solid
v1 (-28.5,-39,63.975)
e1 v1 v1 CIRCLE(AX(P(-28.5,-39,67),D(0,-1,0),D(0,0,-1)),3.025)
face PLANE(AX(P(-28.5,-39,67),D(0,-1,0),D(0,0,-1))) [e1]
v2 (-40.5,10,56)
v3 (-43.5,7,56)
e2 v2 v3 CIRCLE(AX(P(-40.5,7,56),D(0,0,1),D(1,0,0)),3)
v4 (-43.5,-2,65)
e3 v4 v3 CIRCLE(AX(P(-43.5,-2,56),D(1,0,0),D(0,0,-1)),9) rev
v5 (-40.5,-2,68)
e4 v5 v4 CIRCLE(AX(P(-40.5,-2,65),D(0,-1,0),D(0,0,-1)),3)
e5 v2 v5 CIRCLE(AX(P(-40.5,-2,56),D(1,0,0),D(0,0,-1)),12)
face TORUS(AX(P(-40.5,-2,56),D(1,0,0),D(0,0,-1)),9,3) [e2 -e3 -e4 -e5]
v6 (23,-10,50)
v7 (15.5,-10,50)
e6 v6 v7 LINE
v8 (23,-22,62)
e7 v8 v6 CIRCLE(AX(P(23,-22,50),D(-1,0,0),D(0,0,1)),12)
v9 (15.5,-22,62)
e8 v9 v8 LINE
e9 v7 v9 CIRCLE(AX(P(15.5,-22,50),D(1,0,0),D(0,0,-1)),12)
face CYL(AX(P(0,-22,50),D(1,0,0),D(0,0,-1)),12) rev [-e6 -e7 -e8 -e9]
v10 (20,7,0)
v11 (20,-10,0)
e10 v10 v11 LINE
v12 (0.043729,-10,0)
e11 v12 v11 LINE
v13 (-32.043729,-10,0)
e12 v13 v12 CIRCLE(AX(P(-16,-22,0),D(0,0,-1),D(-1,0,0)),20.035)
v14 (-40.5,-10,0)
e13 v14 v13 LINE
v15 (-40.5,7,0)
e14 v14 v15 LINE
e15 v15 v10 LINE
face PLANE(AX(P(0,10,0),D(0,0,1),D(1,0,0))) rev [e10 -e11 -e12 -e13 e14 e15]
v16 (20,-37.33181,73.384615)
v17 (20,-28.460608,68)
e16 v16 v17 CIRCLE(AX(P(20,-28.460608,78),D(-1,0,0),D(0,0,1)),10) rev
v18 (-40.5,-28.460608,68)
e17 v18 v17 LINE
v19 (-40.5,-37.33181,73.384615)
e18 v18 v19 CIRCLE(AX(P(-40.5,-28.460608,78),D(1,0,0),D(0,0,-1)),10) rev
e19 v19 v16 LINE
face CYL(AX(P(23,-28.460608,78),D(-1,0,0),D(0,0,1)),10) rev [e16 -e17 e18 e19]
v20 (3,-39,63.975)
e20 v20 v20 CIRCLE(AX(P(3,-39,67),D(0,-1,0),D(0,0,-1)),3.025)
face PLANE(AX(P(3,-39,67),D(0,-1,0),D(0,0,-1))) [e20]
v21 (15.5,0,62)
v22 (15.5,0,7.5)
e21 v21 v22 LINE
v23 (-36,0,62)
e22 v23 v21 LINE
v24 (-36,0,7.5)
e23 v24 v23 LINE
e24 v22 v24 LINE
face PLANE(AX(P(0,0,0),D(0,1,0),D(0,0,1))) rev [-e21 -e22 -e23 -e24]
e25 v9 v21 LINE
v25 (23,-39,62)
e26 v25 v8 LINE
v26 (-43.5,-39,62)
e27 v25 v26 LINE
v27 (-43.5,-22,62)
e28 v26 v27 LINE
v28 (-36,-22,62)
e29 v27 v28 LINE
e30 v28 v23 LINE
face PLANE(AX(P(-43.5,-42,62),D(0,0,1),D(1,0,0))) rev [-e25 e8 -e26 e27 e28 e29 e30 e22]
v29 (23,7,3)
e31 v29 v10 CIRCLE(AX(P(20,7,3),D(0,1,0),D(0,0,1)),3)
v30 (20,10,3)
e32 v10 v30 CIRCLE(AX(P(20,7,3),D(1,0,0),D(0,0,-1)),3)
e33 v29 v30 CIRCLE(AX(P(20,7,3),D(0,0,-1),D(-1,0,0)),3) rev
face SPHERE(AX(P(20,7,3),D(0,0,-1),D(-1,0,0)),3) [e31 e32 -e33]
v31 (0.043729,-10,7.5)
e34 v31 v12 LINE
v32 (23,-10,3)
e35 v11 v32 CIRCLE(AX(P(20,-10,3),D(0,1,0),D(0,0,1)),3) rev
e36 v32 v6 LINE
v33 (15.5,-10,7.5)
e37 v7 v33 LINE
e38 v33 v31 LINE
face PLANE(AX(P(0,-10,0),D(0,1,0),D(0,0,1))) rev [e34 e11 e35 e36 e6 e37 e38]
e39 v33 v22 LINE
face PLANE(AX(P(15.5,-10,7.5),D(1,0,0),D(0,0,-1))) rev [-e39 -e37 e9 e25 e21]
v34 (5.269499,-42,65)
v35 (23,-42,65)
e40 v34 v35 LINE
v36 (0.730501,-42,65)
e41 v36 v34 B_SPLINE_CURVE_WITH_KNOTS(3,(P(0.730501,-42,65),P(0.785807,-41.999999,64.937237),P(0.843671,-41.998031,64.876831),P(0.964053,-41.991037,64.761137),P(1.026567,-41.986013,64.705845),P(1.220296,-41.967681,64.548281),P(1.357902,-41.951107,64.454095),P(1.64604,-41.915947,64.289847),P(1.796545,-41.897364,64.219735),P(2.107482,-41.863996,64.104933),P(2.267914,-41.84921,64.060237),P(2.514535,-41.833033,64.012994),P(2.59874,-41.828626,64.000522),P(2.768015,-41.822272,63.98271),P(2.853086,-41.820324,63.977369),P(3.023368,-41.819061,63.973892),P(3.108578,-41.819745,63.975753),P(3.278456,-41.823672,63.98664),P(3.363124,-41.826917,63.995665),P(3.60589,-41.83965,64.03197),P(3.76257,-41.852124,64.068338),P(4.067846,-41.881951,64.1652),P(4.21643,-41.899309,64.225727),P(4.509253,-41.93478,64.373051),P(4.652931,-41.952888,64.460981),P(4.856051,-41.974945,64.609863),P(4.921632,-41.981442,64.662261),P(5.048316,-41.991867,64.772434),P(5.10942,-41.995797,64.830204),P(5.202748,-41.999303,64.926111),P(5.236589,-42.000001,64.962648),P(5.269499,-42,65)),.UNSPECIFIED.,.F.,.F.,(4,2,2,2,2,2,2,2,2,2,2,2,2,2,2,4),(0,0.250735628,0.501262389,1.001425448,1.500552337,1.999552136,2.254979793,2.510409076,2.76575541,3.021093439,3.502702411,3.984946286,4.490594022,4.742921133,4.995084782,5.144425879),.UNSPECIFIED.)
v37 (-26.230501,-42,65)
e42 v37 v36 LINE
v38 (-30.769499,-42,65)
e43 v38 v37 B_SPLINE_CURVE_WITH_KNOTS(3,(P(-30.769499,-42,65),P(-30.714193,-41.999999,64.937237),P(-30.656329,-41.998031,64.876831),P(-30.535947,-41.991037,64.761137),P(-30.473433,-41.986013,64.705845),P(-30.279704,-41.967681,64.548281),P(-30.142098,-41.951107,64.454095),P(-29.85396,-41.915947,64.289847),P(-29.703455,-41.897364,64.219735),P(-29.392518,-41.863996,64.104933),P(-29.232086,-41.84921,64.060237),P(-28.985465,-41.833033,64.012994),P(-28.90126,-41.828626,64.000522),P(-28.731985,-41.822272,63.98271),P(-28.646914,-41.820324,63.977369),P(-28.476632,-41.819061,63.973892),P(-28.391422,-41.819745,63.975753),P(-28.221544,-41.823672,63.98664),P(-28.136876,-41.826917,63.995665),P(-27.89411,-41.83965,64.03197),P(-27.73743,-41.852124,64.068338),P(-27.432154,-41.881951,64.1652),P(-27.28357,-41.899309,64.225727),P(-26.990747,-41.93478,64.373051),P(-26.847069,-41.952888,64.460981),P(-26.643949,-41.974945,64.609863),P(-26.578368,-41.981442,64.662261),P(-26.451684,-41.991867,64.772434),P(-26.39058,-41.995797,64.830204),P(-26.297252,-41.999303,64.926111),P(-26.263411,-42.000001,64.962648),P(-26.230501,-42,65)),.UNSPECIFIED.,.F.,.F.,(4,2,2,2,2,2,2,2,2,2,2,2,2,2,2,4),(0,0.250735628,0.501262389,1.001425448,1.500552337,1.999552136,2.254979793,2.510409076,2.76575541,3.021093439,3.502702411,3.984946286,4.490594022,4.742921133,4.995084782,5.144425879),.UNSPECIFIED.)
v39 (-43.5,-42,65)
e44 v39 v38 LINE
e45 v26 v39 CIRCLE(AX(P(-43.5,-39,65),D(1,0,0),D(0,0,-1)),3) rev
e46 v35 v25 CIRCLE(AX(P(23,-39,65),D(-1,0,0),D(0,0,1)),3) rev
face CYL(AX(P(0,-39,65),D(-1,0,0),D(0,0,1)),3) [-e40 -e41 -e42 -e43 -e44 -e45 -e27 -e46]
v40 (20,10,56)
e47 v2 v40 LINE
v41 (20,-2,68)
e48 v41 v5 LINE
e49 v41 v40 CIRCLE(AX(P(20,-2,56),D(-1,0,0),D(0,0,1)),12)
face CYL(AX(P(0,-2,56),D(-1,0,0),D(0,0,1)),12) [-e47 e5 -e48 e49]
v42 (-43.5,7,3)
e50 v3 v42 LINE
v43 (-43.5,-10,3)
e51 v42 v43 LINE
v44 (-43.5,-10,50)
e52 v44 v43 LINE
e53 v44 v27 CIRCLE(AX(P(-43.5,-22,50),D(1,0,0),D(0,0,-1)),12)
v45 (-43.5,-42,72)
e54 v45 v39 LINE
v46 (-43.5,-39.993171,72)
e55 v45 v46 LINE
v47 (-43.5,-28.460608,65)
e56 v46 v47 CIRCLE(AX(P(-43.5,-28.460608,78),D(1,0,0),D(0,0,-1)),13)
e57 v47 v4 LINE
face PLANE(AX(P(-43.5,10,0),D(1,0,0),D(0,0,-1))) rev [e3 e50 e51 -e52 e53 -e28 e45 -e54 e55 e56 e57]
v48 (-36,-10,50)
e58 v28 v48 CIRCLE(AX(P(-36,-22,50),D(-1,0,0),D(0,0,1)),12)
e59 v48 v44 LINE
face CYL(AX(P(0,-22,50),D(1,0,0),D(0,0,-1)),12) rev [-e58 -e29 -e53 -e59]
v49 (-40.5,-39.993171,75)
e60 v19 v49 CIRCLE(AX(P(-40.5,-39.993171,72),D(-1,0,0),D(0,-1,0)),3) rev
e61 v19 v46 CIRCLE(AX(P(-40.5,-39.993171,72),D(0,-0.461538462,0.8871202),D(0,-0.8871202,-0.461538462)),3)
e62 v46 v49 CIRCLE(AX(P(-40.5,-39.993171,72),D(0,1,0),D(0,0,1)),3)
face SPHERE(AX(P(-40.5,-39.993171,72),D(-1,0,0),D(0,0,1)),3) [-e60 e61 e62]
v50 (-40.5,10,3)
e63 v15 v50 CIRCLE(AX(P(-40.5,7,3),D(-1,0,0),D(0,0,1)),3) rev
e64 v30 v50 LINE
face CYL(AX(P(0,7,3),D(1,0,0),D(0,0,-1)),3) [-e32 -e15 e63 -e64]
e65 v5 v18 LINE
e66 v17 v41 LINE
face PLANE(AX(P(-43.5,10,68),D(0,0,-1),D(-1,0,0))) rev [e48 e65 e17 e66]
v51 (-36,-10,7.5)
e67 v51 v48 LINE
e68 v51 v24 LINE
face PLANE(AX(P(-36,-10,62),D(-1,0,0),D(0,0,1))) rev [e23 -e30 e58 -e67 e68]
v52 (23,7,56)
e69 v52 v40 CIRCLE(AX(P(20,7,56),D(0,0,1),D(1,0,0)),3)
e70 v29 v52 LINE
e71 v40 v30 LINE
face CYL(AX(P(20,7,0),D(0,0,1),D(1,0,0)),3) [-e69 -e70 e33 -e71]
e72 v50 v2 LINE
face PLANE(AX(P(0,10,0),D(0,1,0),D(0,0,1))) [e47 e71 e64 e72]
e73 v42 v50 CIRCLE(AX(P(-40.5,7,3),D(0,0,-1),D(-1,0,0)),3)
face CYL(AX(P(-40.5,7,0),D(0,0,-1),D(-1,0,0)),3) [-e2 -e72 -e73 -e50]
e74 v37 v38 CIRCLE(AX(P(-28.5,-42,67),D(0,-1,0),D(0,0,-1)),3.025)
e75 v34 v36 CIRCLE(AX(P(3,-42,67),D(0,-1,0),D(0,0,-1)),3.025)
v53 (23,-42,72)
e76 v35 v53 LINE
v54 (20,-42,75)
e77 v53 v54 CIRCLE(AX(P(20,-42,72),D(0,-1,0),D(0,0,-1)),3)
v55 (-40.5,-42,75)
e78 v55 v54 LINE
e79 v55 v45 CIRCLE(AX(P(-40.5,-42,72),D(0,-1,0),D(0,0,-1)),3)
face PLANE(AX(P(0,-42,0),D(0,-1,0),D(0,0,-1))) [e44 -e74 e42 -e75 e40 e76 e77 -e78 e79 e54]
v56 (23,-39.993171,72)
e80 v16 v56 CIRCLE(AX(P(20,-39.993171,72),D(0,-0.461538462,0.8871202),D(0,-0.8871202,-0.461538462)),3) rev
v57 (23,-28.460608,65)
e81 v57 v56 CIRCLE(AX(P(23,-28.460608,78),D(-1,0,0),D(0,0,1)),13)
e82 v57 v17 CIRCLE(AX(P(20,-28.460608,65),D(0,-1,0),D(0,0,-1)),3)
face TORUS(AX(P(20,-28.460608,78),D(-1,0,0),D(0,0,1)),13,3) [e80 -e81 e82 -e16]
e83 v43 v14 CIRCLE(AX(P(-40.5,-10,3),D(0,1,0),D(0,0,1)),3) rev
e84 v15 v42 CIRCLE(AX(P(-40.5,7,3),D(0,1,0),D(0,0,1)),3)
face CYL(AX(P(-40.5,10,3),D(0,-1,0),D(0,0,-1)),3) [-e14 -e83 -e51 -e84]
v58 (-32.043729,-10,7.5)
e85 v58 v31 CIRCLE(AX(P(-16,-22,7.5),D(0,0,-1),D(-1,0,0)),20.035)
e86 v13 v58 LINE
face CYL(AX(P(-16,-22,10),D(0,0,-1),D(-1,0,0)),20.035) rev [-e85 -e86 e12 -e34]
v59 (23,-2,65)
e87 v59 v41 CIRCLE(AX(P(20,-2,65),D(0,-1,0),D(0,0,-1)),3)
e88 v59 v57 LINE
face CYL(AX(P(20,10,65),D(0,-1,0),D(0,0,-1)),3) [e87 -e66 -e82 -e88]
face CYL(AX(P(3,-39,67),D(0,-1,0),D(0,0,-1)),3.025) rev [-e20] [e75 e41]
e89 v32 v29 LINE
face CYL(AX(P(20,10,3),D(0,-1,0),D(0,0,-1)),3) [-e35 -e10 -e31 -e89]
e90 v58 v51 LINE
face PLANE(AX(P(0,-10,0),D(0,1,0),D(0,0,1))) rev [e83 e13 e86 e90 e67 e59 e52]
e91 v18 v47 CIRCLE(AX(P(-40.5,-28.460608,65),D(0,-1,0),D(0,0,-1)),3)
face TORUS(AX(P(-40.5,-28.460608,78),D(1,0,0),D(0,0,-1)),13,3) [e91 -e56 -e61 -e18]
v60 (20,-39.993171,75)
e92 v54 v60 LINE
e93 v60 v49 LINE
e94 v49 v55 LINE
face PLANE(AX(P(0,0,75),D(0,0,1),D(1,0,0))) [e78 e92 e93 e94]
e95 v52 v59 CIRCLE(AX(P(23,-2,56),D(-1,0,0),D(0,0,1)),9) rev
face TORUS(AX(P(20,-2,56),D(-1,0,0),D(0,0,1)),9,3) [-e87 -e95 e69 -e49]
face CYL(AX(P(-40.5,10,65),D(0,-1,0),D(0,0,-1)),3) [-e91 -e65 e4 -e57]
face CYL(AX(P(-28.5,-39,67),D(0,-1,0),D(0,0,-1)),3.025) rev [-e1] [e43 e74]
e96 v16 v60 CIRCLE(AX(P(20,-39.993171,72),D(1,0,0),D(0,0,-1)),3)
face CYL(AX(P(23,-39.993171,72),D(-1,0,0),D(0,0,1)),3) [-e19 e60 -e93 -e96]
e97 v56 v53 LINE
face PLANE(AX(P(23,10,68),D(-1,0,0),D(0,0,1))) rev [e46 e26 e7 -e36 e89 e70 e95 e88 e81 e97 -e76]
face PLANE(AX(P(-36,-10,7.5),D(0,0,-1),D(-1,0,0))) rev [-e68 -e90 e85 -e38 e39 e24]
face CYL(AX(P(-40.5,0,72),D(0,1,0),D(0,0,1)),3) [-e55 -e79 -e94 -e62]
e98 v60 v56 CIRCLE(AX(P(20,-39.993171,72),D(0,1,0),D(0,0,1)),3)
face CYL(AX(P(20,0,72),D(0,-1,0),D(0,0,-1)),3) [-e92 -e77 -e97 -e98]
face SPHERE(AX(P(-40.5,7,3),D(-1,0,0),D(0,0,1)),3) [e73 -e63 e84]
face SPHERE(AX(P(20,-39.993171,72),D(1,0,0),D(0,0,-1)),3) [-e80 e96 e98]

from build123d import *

# Parameters (mm, degrees)
BOSS_EXTRUDE1_DEPTH = 10
SKETCH2_W           = 66.5
SKETCH2_H           = 6
BOSS_EXTRUDE2_DEPTH = 42
BOSS_EXTRUDE3_DEPTH = 10
SKETCH3_R           = 20.035
CUT_EXTRUDE2_DEPTH  = 10
FILLET1_R           = 12
SKETCH7_W           = 66.5
SKETCH7_H           = 4
BOSS_EXTRUDE4_DEPTH = 7
SKETCH8_R           = 3.025
CUT_EXTRUDE3_DEPTH  = 3
FILLET2_R           = 12
FILLET3_R           = 10
FILLET4_R           = 3
FILLET5_R           = 3


with BuildPart() as part:
    # Sketch1 → Boss-Extrude1 (new body)
    with BuildSketch(Plane(origin=(0, 0, 0), x_dir=(1, 0, 0), z_dir=(0, 1, 0))):
        Polygon((0, 0), (-43.5, 0), (-43.5, -68), (23, -68), (23, 0), align=None)
    extrude(amount=BOSS_EXTRUDE1_DEPTH)

    # Sketch2 → Boss-Extrude2 (add)
    with BuildSketch(Plane.XZ):
        with Locations((-10.25, 65)):
            Rectangle(SKETCH2_W, SKETCH2_H)
    extrude(amount=BOSS_EXTRUDE2_DEPTH)

    # Sketch4 → Boss-Extrude3 (add)
    with BuildSketch(Plane.XZ):
        Polygon((-43.5, 62), (-36, 62), (-36, 7.5), (15.5, 7.5), (15.5, 62), (23, 62), (23, 0), (-43.5, 0), align=None)
    extrude(amount=BOSS_EXTRUDE3_DEPTH)

    # Sketch3 → Cut-Extrude2 (cut)
    with BuildSketch(Plane(origin=(0, 0, 0), x_dir=(-1, 0, 0), z_dir=(0, 0, -1))):
        with Locations((16, -22)):
            Circle(SKETCH3_R)
    extrude(amount=-CUT_EXTRUDE2_DEPTH, mode=Mode.SUBTRACT)

    # Fillet1
    fillet1_edges = [part.edges().sort_by_distance(p)[0] for p in [
        (19.25, -10, 62),
        (-39.75, -10, 62),
    ]]
    fillet(fillet1_edges, radius=FILLET1_R)

    # Sketch7 → Boss-Extrude4 (add)
    with BuildSketch(Plane.XY.offset(68)):
        with Locations((-10.25, -40)):
            Rectangle(SKETCH7_W, SKETCH7_H)
    extrude(amount=BOSS_EXTRUDE4_DEPTH)

    # Sketch8 → Cut-Extrude3 (cut)
    with BuildSketch(Plane.XZ.offset(42)):
        with Locations(Location((-28.5, 67, 0), (0, 0, 270))):
            Circle(SKETCH8_R)
        with Locations(Location((3, 67, 0), (0, 0, 270))):
            Circle(SKETCH8_R)
    extrude(amount=-CUT_EXTRUDE3_DEPTH, mode=Mode.SUBTRACT)

    # Fillet2
    fillet2_edges = [part.edges().sort_by_distance(p)[0] for p in [
        (-10.25, 10, 68),
    ]]
    fillet(fillet2_edges, radius=FILLET2_R)

    # Fillet3
    # the kernel refuses this fillet: 10 mm, written as the material it adds along each edge
    with BuildSketch(Plane(origin=(23, -38, 68), x_dir=(0, 1, 0), z_dir=(-1, 0, 0))) as fillet3_piece_1:
        with BuildLine():
            CenterArc((9.539392014, -10), FILLET3_R, 90, 72.542396876)
            Line((0, -7), (-0.19078784, -6.94))
            ThreePointArc((-0.19078784, -6.94), (-0.2, -3.5), (-0.2, 0))
            Line((-0.2, 0), (0, 0.2))
            Line((0, 0.2), (9.539392014, 0.2))
            Line((9.539392014, 0.2), (9.539392014, 0))
        make_face()
    extrude(amount=66.5)

    # Fillet4
    # the kernel refuses this fillet: 3 mm, written as the material it takes off along each edge
    with BuildSketch(Plane(origin=(-51, -42, 62), x_dir=(0, 0, 1), z_dir=(1, 0, 0))) as fillet4_piece_1:
        with BuildLine():
            CenterArc((FILLET4_R, -FILLET4_R), FILLET4_R, 90, 90)
            Line((0, -FILLET4_R), (0, 0))
            Line((0, 0), (FILLET4_R, 0))
        make_face()
    extrude(amount=81.5, mode=Mode.SUBTRACT)

    # Fillet5
    fillet5_edges = [part.edges().sort_by_distance(p)[0] for p in [
        (23, 10, 28),
        (23, -15.230303993, 68),
        (23, 6.485281374, 64.485281374),
        (-43.5, -15.230303993, 68),
        (-43.5, 6.485281374, 64.485281374),
        (-43.5, -34.376687769, 69.937742252),
        (23, -34.376687769, 69.937742252),
        (-43.5, 10, 28),
        (-10.25, 10, 0),
        (-43.5, -40, 75),
        (23, -40, 75),
        (23, 0, 0),
        (-10.25, -38, 75),
        (-43.5, 0, 0),
    ]]
    fillet(fillet5_edges, radius=FILLET5_R)


solid = part.part
